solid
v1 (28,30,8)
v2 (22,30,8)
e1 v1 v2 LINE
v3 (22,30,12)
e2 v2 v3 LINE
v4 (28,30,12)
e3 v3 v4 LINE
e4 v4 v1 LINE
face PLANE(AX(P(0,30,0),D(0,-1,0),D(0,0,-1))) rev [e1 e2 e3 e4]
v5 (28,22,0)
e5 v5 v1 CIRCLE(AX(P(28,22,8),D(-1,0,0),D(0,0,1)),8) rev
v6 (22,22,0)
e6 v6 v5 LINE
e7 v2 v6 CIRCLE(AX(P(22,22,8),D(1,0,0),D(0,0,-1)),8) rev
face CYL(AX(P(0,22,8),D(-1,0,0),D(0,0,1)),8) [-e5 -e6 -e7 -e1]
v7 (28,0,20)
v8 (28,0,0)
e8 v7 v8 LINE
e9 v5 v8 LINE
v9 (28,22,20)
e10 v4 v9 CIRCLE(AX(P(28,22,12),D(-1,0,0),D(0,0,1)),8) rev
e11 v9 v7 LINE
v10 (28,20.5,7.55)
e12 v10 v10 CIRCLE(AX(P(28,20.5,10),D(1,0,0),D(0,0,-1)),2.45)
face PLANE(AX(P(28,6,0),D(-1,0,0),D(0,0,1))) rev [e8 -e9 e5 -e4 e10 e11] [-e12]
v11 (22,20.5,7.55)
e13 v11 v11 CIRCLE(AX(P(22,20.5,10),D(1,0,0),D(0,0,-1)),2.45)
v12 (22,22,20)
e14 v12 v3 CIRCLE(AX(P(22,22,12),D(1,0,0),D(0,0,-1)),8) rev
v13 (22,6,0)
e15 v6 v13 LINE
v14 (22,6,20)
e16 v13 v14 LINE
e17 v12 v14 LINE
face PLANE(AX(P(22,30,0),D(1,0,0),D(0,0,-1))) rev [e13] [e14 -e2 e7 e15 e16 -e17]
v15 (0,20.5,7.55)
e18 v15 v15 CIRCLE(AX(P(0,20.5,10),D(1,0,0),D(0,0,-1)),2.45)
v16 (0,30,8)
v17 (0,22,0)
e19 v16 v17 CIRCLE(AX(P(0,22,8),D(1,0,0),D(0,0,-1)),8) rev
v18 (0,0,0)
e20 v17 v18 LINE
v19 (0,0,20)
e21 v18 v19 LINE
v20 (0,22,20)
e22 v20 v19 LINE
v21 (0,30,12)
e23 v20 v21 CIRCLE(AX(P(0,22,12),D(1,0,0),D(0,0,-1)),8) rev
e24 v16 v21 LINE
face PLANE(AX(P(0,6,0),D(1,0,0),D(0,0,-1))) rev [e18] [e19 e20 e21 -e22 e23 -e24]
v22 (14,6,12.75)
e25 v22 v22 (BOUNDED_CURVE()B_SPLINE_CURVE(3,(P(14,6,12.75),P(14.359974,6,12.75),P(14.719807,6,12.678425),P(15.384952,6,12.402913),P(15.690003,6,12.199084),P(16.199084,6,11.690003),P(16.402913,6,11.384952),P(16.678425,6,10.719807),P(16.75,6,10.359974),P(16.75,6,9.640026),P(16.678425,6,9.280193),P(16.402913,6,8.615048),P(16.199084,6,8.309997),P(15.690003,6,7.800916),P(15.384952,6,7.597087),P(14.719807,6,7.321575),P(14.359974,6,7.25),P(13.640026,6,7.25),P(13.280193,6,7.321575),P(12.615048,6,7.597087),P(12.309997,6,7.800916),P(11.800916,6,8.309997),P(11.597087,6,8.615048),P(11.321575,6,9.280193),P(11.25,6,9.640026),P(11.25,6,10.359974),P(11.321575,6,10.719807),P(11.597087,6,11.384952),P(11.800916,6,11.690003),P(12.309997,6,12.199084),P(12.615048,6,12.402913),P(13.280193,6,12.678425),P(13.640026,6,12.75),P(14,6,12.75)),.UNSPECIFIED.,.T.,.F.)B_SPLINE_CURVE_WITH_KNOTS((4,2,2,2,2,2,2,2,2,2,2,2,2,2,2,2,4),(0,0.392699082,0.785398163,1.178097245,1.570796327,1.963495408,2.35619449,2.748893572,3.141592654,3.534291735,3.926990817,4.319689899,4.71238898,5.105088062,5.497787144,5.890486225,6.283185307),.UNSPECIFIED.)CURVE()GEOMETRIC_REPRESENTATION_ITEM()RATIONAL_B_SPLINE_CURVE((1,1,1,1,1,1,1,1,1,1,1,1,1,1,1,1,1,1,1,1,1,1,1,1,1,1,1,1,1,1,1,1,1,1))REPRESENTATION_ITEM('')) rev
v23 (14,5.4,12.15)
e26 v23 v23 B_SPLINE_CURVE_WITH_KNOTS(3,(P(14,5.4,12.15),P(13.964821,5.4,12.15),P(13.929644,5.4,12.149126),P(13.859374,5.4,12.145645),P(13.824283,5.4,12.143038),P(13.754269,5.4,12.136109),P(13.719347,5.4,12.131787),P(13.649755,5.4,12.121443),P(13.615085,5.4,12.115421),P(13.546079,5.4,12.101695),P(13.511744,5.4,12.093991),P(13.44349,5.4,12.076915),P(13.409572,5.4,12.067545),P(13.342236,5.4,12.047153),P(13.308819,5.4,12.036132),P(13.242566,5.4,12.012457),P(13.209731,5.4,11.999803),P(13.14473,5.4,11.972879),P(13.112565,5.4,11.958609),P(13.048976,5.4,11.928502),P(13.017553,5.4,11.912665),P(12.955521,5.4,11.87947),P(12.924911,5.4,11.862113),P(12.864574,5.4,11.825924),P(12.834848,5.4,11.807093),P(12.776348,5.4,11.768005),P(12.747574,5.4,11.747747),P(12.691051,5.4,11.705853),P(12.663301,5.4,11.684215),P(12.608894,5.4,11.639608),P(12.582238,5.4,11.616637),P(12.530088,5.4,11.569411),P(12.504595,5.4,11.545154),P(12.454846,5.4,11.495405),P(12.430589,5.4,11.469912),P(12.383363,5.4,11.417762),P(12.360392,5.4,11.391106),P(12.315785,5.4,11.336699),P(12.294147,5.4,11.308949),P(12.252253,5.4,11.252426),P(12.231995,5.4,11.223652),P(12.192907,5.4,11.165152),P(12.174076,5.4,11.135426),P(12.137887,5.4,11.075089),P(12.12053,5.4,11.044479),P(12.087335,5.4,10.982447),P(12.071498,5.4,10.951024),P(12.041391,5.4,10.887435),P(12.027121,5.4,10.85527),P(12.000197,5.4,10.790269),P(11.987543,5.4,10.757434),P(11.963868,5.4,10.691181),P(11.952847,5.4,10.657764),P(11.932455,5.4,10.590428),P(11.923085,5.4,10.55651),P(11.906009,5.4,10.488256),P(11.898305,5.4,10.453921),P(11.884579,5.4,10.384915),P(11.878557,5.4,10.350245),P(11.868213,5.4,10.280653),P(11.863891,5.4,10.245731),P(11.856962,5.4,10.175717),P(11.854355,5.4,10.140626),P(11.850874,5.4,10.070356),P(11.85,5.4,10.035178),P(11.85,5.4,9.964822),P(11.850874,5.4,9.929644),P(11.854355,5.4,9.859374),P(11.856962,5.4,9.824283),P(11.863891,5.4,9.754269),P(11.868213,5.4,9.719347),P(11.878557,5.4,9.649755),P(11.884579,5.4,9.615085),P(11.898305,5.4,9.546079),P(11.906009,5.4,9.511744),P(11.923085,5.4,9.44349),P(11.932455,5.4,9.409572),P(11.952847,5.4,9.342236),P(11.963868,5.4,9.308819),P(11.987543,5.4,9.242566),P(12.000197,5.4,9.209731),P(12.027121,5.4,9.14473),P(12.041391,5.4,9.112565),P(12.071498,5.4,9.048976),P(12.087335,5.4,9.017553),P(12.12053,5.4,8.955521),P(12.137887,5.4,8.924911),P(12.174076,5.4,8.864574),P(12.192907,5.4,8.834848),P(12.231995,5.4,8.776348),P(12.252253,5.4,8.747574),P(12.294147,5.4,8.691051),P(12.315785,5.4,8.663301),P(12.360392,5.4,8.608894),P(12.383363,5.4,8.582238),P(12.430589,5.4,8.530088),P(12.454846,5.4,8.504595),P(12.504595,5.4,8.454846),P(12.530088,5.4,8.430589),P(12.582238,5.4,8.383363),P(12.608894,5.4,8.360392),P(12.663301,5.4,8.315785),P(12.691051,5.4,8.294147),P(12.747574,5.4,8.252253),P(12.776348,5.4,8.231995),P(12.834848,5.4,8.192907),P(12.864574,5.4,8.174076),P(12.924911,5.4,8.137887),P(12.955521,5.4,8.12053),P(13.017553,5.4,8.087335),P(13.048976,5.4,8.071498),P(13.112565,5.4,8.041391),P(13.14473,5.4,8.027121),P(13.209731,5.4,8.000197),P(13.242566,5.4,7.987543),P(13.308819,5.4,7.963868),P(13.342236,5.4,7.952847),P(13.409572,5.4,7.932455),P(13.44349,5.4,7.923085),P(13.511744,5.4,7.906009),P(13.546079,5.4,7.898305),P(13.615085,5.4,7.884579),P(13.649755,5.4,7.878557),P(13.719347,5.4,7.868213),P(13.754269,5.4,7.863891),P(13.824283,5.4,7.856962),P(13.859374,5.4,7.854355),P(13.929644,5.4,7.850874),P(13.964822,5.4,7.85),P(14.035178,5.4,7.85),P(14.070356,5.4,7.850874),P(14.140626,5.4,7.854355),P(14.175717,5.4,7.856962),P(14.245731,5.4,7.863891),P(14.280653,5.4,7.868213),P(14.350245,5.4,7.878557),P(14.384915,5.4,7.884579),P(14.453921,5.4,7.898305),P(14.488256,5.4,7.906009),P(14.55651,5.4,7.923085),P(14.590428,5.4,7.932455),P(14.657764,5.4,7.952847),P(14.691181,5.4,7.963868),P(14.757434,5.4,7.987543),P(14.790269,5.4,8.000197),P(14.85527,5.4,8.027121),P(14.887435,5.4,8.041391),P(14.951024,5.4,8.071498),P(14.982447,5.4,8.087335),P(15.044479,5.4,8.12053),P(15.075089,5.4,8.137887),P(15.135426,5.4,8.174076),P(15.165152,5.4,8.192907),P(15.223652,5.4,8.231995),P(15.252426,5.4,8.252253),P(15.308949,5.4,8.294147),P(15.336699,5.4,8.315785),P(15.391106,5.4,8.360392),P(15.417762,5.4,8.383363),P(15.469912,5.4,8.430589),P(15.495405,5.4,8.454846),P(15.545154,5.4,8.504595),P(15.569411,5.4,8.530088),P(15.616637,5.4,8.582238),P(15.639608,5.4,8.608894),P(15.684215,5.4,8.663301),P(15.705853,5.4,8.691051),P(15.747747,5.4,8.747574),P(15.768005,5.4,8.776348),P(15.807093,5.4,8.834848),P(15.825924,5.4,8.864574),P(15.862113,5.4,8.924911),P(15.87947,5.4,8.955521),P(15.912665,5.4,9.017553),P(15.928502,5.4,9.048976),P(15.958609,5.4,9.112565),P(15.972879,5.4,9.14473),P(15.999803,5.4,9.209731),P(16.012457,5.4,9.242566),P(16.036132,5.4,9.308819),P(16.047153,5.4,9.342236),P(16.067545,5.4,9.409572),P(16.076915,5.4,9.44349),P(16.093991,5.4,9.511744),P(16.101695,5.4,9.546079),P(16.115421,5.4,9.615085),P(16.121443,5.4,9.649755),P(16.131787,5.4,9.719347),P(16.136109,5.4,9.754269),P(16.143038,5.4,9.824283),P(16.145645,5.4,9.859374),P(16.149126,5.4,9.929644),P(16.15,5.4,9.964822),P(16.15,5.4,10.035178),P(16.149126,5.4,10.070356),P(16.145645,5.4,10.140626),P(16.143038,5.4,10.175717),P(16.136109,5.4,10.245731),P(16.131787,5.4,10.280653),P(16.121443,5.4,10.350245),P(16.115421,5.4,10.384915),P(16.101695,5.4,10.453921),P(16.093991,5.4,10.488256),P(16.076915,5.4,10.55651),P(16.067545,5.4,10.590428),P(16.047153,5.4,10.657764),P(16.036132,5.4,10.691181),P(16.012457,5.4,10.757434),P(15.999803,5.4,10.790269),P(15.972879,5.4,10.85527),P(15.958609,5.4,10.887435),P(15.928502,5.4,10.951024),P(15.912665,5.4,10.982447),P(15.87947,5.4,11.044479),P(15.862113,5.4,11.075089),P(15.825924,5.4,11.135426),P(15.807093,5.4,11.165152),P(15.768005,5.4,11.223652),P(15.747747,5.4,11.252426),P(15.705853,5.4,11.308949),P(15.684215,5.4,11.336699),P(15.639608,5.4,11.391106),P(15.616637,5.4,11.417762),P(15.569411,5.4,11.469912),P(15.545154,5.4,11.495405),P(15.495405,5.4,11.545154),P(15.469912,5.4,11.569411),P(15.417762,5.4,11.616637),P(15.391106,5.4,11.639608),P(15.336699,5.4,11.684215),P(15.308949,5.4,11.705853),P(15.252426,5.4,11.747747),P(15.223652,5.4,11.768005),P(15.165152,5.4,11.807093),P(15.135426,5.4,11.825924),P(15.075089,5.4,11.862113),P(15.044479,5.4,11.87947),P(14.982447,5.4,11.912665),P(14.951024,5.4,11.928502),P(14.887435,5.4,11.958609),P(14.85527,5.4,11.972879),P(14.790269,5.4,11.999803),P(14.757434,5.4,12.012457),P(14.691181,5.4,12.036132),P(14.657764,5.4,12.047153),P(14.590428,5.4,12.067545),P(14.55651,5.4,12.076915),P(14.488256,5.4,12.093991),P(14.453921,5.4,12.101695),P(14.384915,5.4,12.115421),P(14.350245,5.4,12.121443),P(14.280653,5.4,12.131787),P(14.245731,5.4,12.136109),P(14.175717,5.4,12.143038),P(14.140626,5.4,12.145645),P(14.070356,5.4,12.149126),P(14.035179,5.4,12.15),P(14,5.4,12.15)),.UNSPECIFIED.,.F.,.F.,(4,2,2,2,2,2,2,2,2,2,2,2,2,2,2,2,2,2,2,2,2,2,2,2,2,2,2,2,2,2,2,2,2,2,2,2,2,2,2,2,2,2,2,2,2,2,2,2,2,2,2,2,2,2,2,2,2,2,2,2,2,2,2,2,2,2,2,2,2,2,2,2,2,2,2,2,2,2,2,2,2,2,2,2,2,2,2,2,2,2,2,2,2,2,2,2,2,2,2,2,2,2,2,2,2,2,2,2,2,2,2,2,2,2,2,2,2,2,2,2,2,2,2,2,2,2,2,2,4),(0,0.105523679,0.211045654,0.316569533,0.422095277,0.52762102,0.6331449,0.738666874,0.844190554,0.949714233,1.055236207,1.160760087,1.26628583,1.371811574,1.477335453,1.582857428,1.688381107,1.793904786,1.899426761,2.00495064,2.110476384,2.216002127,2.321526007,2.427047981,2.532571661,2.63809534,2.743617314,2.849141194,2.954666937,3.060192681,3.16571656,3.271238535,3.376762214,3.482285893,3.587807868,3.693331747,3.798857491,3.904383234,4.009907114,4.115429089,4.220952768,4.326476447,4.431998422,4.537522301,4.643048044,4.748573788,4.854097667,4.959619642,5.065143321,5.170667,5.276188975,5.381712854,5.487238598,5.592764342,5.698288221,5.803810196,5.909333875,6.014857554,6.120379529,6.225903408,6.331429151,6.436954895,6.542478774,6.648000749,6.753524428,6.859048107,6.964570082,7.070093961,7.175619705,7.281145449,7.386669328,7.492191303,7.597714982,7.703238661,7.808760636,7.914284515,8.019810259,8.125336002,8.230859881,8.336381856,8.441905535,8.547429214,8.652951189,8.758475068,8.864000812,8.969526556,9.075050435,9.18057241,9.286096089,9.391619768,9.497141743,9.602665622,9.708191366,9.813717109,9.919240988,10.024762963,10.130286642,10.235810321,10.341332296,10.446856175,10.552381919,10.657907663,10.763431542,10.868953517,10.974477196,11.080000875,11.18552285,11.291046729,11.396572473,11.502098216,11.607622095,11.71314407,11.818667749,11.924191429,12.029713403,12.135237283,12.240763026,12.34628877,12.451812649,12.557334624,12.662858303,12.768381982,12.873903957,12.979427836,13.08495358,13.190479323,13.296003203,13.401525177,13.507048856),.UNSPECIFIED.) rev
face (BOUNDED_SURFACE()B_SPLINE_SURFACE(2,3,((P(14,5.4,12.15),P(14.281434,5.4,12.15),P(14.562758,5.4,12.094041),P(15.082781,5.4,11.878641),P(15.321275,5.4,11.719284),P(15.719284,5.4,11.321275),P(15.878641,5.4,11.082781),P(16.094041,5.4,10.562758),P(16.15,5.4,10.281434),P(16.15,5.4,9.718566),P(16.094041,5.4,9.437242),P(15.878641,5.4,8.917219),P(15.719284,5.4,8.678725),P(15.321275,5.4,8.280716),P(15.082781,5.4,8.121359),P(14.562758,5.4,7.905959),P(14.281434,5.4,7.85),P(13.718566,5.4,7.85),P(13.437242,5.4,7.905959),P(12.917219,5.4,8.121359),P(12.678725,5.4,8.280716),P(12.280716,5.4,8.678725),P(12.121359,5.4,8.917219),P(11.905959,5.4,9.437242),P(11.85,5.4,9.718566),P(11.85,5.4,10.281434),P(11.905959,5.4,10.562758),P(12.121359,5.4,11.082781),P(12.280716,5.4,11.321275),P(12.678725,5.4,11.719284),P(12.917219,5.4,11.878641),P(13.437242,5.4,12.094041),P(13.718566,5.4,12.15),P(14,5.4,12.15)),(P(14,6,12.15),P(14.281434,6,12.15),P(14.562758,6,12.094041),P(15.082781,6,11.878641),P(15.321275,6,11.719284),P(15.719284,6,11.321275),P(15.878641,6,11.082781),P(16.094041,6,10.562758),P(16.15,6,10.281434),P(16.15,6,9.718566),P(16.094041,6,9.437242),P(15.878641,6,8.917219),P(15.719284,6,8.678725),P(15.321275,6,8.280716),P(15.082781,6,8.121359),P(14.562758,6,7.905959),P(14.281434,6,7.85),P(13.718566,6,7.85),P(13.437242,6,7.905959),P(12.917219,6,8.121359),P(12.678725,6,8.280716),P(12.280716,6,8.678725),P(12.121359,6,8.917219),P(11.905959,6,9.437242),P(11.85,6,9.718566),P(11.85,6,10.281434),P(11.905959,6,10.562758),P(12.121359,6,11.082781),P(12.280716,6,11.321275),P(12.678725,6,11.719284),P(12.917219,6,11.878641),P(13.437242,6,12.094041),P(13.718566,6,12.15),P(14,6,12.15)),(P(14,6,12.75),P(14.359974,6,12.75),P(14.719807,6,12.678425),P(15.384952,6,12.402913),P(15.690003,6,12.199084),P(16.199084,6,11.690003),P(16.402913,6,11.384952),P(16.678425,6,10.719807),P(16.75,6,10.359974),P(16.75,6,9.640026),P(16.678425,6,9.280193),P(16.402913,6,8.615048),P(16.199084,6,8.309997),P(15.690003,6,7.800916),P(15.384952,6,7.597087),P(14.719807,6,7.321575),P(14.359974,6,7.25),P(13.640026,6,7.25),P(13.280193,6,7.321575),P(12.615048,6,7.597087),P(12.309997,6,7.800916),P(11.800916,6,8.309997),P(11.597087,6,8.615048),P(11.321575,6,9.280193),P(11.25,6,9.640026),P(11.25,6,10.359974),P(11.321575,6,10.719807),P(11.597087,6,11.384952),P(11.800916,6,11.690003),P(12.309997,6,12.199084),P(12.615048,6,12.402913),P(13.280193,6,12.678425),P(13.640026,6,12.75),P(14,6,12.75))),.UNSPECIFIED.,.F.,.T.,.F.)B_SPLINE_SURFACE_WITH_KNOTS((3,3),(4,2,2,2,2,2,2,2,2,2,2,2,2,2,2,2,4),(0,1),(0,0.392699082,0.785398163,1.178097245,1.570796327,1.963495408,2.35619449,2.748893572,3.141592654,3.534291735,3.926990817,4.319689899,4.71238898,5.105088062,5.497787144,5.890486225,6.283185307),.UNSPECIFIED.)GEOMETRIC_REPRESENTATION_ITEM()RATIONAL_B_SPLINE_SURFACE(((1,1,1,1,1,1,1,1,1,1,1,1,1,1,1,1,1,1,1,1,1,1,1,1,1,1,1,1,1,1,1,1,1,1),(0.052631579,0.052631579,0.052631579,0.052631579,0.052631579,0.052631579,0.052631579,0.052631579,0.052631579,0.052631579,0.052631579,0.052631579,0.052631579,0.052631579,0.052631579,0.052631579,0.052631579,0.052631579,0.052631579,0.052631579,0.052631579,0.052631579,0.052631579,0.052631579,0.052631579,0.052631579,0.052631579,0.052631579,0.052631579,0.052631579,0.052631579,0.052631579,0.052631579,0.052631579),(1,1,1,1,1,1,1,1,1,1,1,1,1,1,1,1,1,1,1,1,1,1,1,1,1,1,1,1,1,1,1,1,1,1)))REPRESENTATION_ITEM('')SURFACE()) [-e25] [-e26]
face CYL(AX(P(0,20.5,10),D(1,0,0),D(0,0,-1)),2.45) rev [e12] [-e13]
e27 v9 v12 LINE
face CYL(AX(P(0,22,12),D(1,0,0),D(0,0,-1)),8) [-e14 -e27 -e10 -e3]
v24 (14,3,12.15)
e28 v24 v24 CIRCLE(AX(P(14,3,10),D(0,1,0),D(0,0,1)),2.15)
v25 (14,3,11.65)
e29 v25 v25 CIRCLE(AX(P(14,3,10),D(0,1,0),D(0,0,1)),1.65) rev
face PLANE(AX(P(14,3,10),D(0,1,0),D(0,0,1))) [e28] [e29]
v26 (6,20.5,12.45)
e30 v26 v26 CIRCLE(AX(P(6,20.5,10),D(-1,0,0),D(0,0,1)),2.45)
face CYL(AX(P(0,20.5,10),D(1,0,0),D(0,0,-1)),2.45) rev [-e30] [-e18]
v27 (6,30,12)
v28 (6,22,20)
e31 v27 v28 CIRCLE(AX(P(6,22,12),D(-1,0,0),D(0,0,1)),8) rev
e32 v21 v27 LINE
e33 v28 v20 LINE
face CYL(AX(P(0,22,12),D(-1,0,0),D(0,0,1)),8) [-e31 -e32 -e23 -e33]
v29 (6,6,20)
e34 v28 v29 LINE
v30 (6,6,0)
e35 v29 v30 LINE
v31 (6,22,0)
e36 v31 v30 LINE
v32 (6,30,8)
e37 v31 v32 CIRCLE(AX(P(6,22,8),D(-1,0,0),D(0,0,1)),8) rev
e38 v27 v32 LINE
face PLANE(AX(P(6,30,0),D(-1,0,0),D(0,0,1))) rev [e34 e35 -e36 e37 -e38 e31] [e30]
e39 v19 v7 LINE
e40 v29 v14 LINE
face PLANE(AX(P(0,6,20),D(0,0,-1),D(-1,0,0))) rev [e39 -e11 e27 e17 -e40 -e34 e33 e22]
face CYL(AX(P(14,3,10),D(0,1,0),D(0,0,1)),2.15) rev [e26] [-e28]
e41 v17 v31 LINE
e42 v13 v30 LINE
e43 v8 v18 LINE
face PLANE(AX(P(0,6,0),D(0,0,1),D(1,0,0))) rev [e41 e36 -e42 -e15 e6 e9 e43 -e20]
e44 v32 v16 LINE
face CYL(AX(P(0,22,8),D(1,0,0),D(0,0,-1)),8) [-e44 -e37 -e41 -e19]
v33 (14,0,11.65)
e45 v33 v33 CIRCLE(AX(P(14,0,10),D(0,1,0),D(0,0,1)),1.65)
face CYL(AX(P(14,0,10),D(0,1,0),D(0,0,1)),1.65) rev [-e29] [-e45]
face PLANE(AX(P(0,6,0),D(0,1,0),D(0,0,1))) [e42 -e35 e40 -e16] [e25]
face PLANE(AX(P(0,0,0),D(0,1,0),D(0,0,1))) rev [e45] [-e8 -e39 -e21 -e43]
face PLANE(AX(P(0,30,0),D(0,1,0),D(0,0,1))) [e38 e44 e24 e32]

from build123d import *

# Parameters (mm, degrees)
SKETCH1_W               = 28
SKETCH1_H               = 20
BOSS_EXTRUDE1_DEPTH     = 6
SKETCH2_W               = 6
SKETCH2_H               = 20
BOSS_EXTRUDE2_DEPTH     = 24
CUT_EXTRUDE1_DEPTH      = 43.237424164
CUT_EXTRUDE1_DEPTH_BACK = 43.237424164
SKETCH3_R               = 2.45
SKETCH4_R               = 1.65
CUT_EXTRUDE2_DEPTH      = 42.952353927
SKETCH5_R               = 2.15
CUT_EXTRUDE3_DEPTH      = 3
FILLET1_SIZE            = 0.6
FILLET2_R               = 8


with BuildPart() as part:
    # Sketch1 → Boss-Extrude1 (new body)
    with BuildSketch(Plane(origin=(0, 0, 0), x_dir=(1, 0, 0), z_dir=(0, 1, 0))):
        with Locations((14, -10)):
            Rectangle(SKETCH1_W, SKETCH1_H)
    extrude(amount=BOSS_EXTRUDE1_DEPTH)

    # Sketch2 → Boss-Extrude2 (add)
    with BuildSketch(Plane(origin=(0, 6, 0), x_dir=(1, 0, 0), z_dir=(0, 1, 0))):
        with Locations((3, -10)):
            Rectangle(SKETCH2_W, SKETCH2_H)
        with Locations((25, -10)):
            Rectangle(SKETCH2_W, SKETCH2_H)
    extrude(amount=BOSS_EXTRUDE2_DEPTH)

    # Sketch3 → Cut-Extrude1 (cut, two sides: drawn at the far end of the back side and taken through both)
    with BuildSketch(Plane(origin=(6, 0, 0), x_dir=(0, 0, -1), z_dir=(1, 0, 0)).offset(-CUT_EXTRUDE1_DEPTH_BACK)):
        with Locations((-10, 20.5)):
            Circle(SKETCH3_R)
    extrude(amount=CUT_EXTRUDE1_DEPTH + CUT_EXTRUDE1_DEPTH_BACK, mode=Mode.SUBTRACT)

    # Sketch4 → Cut-Extrude2 (cut, through all)
    with BuildSketch(Plane(origin=(0, 6, 0), x_dir=(1, 0, 0), z_dir=(0, 1, 0))):
        with Locations(Location((14, -10, 0), (0, 0, 270))):
            Circle(SKETCH4_R)
    extrude(amount=-CUT_EXTRUDE2_DEPTH, mode=Mode.SUBTRACT)

    # Sketch5 → Cut-Extrude3 (cut)
    with BuildSketch(Plane(origin=(0, 6, 0), x_dir=(1, 0, 0), z_dir=(0, 1, 0))):
        with Locations(Location((14, -10, 0), (0, 0, 270))):
            Circle(SKETCH5_R)
    extrude(amount=-CUT_EXTRUDE3_DEPTH, mode=Mode.SUBTRACT)

    # Fillet1
    # a fillet whose section is not a circle: 0.6 mm, written as the material it takes off along each edge
    with BuildSketch(Plane(origin=(14, 6, 10), x_dir=(0, 0, 1), z_dir=(-1, 0, 0))) as fillet1_piece_1:
        with BuildLine():
            Bezier((2.15 + FILLET1_SIZE, 0), (2.15, 0), (2.15, -FILLET1_SIZE), weights=[1, 0.052631579, 1])
            Line((2.15, -FILLET1_SIZE), (2.15, 0))
            Line((2.15, 0), (2.15 + FILLET1_SIZE, 0))
        make_face()
    revolve(axis=Axis((14, 6, 10), (0, 1, 0)), mode=Mode.SUBTRACT)

    # Fillet2
    fillet2_edges = [part.edges().sort_by_distance(p)[0] for p in [
        (3, 30, 20),
        (3, 30, 0),
        (25, 30, 0),
        (25, 30, 20),
    ]]
    fillet(fillet2_edges, radius=FILLET2_R)


solid = part.part
